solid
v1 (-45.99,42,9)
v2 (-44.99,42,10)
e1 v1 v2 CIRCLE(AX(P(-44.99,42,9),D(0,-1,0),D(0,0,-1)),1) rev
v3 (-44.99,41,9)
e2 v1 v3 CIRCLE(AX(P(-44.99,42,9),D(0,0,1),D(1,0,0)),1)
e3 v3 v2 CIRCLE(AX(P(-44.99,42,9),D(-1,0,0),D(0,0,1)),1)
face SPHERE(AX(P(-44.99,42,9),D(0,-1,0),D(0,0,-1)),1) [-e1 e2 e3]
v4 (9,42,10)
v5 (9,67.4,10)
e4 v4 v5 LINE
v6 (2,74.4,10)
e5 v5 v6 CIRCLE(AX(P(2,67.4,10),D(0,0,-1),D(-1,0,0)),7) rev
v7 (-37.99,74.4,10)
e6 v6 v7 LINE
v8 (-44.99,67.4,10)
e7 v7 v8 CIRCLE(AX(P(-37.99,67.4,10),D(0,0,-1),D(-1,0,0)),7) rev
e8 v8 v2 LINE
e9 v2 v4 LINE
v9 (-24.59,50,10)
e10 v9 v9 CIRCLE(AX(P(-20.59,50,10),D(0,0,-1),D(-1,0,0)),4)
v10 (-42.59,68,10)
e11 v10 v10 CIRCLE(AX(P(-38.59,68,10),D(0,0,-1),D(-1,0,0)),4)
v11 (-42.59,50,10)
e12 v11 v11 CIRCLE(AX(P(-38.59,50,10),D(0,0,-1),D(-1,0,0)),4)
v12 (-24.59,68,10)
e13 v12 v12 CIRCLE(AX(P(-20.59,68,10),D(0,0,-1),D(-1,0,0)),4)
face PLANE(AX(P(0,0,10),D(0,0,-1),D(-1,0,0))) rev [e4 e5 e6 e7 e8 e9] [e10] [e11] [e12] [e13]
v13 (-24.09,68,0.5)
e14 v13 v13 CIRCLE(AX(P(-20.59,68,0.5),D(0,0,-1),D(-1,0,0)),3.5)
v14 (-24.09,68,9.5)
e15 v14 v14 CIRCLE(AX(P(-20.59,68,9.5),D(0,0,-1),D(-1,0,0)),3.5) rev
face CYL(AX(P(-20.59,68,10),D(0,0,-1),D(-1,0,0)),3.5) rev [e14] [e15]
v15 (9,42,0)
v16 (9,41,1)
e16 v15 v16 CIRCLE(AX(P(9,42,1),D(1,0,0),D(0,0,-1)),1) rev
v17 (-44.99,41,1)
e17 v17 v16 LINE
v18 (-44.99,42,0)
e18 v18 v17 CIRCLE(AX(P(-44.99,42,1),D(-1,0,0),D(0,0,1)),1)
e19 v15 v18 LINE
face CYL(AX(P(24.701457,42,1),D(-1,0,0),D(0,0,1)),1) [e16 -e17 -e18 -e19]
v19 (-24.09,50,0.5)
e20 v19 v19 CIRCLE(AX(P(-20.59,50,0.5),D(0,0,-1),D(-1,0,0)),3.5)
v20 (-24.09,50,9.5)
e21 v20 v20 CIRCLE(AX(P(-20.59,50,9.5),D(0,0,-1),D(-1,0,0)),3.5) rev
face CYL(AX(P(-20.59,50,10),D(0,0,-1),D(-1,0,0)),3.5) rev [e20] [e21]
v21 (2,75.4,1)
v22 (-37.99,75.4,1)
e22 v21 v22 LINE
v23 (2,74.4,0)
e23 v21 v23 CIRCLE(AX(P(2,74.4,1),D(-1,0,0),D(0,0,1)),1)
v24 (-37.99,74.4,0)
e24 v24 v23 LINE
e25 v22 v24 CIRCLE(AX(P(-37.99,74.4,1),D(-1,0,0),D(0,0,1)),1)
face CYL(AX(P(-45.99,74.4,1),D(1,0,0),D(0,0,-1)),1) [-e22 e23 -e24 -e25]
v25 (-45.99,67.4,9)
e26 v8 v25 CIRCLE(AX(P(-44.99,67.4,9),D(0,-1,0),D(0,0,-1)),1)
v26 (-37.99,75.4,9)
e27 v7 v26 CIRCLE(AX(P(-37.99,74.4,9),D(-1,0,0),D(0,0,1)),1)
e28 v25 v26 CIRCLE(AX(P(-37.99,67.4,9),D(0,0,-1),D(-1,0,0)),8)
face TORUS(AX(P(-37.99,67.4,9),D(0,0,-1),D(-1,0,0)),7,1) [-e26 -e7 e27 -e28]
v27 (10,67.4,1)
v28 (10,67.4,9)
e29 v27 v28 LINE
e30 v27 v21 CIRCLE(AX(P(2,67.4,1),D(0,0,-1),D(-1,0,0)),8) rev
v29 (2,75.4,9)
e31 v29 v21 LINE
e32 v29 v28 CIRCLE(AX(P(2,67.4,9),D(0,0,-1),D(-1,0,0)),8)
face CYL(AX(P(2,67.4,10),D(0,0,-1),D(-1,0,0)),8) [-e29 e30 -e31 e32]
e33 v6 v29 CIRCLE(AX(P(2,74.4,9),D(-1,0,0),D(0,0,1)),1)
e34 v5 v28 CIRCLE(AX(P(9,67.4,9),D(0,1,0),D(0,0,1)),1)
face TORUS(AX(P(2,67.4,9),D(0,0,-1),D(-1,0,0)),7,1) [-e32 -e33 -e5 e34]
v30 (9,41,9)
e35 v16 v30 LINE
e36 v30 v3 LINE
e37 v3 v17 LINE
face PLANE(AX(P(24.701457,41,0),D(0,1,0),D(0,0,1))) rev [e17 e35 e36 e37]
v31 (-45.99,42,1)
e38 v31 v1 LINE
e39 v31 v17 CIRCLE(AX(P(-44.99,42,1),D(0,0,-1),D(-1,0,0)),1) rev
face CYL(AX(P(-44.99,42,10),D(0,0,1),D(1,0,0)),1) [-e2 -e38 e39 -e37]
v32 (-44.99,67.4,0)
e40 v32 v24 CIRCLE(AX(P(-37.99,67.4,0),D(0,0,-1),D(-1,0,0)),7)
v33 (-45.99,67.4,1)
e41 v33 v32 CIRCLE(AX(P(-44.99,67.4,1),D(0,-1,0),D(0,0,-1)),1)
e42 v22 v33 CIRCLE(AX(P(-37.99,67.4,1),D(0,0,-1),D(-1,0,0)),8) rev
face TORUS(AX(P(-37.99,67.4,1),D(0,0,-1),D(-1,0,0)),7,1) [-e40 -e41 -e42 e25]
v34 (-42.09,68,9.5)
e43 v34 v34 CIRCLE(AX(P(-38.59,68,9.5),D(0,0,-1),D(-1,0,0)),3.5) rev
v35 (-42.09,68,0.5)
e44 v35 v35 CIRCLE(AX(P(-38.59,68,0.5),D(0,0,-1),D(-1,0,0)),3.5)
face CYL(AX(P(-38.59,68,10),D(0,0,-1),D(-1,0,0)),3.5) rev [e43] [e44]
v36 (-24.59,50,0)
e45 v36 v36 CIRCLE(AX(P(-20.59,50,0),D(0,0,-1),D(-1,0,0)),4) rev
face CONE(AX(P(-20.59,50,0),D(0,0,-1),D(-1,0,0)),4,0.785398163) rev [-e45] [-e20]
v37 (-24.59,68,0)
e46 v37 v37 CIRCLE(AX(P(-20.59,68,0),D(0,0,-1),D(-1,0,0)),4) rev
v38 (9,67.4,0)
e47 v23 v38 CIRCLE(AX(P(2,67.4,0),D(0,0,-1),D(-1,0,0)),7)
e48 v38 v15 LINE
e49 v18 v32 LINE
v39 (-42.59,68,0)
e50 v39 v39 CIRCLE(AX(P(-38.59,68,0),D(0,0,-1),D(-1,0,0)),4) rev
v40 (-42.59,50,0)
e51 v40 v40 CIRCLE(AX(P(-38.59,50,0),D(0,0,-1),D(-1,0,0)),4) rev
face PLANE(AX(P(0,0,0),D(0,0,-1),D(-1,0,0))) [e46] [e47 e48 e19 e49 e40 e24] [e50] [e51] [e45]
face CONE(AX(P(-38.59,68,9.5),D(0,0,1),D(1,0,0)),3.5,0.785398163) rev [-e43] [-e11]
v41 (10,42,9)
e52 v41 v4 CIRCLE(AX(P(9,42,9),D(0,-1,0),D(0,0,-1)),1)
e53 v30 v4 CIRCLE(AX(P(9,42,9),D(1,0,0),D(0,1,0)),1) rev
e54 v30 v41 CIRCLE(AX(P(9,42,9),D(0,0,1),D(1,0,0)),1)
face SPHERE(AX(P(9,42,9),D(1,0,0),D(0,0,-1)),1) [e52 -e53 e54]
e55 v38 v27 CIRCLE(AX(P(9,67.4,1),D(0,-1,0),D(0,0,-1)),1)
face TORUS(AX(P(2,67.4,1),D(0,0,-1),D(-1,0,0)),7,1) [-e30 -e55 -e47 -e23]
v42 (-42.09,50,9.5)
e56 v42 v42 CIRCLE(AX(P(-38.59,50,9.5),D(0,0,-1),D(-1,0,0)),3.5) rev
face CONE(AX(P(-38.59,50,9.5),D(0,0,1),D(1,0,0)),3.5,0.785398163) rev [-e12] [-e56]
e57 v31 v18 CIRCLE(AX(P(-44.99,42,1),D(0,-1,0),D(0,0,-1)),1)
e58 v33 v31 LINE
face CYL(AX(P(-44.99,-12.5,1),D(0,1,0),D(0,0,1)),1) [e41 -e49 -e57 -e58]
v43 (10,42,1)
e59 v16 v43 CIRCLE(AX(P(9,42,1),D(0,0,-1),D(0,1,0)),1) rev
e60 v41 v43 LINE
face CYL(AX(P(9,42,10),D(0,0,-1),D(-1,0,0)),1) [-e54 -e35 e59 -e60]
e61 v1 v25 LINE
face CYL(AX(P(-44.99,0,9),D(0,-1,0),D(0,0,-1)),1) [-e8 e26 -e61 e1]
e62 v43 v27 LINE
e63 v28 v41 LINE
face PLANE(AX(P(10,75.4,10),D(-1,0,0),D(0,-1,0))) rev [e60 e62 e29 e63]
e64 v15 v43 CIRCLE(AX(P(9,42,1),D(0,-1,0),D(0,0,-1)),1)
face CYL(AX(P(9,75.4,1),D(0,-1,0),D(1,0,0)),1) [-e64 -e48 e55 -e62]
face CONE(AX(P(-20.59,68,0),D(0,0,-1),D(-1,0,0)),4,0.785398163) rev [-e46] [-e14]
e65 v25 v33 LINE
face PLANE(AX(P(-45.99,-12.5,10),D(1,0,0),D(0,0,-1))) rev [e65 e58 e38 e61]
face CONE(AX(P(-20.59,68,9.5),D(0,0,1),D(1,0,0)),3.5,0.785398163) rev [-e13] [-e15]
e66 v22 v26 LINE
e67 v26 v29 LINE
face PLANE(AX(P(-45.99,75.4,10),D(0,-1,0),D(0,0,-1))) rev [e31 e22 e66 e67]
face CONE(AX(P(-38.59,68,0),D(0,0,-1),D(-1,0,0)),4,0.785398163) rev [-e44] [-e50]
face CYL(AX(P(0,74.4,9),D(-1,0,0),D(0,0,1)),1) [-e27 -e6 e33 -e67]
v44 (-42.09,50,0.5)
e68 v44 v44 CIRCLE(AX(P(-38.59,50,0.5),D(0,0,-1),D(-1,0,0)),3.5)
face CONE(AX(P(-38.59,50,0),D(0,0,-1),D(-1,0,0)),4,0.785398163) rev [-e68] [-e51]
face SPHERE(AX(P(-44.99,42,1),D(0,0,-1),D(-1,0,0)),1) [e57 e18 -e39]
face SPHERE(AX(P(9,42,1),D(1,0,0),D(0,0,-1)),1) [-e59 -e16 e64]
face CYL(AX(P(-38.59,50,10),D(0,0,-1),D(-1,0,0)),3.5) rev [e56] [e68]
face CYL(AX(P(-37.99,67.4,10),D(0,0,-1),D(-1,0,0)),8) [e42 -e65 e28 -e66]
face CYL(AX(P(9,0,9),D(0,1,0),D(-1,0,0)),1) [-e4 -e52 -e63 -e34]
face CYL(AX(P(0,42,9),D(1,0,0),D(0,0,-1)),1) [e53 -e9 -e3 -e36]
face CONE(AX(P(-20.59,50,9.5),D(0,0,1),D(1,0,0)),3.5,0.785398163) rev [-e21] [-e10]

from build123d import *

# Parameters (mm, degrees)
SKETCH1_W           = 55.99
SKETCH1_H           = 87.9
SKETCH1_R           = 3.5
BOSS_EXTRUDE1_DEPTH = 10
FILLET1_R           = 8
FILLET2_R           = 1
CHAMFER1_SIZE       = 0.5


# Read off the part's stored shape, not the designer's step: Split1
with BuildPart() as part:
    # Sketch1 → Boss-Extrude1 (new body)
    with BuildSketch(Plane.XY):
        with Locations((-17.995, 31.45)):
            Rectangle(SKETCH1_W, SKETCH1_H)
        Circle(SKETCH1_R, mode=Mode.SUBTRACT)
        with Locations((-6.59, 32)):
            Circle(SKETCH1_R, mode=Mode.SUBTRACT)
        with Locations((-20.59, 32)):
            Circle(SKETCH1_R, mode=Mode.SUBTRACT)
        with Locations((-14, 0)):
            Circle(SKETCH1_R, mode=Mode.SUBTRACT)
        with Locations((-20.59, 50)):
            Circle(SKETCH1_R, mode=Mode.SUBTRACT)
        with Locations((-20.59, 68)):
            Circle(SKETCH1_R, mode=Mode.SUBTRACT)
        with Locations((-38.59, 68)):
            Circle(SKETCH1_R, mode=Mode.SUBTRACT)
        with Locations((-38.59, 50)):
            Circle(SKETCH1_R, mode=Mode.SUBTRACT)
    extrude(amount=BOSS_EXTRUDE1_DEPTH)

    # Fillet1
    fillet1_edges = [part.edges().sort_by_distance(p)[0] for p in [
        (-45.99, -12.5, 5),
        (-45.99, 75.4, 5),
        (10, 75.4, 5),
        (10, -12.5, 5),
    ]]
    fillet(fillet1_edges, radius=FILLET1_R)


with BuildPart() as body_2:
    # Split1: the piece on the far side of the plane
    add(part.part)
    split(bisect_by=Plane(origin=(0, 41, 0), x_dir=(1, 0, 0), z_dir=(0, 1, 0)), keep=Keep.BOTTOM)


with BuildPart() as part_1:
    add(part.part)

    # Split1
    split(bisect_by=Plane(origin=(0, 41, 0), x_dir=(1, 0, 0), z_dir=(0, 1, 0)), keep=Keep.TOP)

    # Fillet2
    fillet2_edges = [part_1.edges().sort_by_distance(p)[0] for p in [
        (-17.995, 41, 0),
        (-45.99, 54.2, 0),
        (-17.995, 75.4, 0),
        (7.656854249, 73.056854249, 0),
        (-43.646854249, 73.056854249, 0),
        (-17.995, 75.4, 10),
        (-45.99, 54.2, 10),
        (7.656854249, 73.056854249, 10),
        (-43.646854249, 73.056854249, 10),
        (-45.99, 41, 5),
        (10, 54.2, 10),
        (10, 54.2, 0),
        (10, 41, 5),
        (-17.995, 41, 10),
    ]]
    fillet(fillet2_edges, radius=FILLET2_R)

    # Chamfer1
    chamfer1_edges = [part_1.edges().sort_by_distance(p)[0] for p in [
        (-24.09, 50, 0),
        (-24.09, 50, 10),
        (-24.09, 68, 0),
        (-24.09, 68, 10),
        (-42.09, 68, 0),
        (-42.09, 68, 10),
        (-42.09, 50, 0),
        (-42.09, 50, 10),
    ]]
    chamfer(chamfer1_edges, length=CHAMFER1_SIZE)


solid = part_1.part
